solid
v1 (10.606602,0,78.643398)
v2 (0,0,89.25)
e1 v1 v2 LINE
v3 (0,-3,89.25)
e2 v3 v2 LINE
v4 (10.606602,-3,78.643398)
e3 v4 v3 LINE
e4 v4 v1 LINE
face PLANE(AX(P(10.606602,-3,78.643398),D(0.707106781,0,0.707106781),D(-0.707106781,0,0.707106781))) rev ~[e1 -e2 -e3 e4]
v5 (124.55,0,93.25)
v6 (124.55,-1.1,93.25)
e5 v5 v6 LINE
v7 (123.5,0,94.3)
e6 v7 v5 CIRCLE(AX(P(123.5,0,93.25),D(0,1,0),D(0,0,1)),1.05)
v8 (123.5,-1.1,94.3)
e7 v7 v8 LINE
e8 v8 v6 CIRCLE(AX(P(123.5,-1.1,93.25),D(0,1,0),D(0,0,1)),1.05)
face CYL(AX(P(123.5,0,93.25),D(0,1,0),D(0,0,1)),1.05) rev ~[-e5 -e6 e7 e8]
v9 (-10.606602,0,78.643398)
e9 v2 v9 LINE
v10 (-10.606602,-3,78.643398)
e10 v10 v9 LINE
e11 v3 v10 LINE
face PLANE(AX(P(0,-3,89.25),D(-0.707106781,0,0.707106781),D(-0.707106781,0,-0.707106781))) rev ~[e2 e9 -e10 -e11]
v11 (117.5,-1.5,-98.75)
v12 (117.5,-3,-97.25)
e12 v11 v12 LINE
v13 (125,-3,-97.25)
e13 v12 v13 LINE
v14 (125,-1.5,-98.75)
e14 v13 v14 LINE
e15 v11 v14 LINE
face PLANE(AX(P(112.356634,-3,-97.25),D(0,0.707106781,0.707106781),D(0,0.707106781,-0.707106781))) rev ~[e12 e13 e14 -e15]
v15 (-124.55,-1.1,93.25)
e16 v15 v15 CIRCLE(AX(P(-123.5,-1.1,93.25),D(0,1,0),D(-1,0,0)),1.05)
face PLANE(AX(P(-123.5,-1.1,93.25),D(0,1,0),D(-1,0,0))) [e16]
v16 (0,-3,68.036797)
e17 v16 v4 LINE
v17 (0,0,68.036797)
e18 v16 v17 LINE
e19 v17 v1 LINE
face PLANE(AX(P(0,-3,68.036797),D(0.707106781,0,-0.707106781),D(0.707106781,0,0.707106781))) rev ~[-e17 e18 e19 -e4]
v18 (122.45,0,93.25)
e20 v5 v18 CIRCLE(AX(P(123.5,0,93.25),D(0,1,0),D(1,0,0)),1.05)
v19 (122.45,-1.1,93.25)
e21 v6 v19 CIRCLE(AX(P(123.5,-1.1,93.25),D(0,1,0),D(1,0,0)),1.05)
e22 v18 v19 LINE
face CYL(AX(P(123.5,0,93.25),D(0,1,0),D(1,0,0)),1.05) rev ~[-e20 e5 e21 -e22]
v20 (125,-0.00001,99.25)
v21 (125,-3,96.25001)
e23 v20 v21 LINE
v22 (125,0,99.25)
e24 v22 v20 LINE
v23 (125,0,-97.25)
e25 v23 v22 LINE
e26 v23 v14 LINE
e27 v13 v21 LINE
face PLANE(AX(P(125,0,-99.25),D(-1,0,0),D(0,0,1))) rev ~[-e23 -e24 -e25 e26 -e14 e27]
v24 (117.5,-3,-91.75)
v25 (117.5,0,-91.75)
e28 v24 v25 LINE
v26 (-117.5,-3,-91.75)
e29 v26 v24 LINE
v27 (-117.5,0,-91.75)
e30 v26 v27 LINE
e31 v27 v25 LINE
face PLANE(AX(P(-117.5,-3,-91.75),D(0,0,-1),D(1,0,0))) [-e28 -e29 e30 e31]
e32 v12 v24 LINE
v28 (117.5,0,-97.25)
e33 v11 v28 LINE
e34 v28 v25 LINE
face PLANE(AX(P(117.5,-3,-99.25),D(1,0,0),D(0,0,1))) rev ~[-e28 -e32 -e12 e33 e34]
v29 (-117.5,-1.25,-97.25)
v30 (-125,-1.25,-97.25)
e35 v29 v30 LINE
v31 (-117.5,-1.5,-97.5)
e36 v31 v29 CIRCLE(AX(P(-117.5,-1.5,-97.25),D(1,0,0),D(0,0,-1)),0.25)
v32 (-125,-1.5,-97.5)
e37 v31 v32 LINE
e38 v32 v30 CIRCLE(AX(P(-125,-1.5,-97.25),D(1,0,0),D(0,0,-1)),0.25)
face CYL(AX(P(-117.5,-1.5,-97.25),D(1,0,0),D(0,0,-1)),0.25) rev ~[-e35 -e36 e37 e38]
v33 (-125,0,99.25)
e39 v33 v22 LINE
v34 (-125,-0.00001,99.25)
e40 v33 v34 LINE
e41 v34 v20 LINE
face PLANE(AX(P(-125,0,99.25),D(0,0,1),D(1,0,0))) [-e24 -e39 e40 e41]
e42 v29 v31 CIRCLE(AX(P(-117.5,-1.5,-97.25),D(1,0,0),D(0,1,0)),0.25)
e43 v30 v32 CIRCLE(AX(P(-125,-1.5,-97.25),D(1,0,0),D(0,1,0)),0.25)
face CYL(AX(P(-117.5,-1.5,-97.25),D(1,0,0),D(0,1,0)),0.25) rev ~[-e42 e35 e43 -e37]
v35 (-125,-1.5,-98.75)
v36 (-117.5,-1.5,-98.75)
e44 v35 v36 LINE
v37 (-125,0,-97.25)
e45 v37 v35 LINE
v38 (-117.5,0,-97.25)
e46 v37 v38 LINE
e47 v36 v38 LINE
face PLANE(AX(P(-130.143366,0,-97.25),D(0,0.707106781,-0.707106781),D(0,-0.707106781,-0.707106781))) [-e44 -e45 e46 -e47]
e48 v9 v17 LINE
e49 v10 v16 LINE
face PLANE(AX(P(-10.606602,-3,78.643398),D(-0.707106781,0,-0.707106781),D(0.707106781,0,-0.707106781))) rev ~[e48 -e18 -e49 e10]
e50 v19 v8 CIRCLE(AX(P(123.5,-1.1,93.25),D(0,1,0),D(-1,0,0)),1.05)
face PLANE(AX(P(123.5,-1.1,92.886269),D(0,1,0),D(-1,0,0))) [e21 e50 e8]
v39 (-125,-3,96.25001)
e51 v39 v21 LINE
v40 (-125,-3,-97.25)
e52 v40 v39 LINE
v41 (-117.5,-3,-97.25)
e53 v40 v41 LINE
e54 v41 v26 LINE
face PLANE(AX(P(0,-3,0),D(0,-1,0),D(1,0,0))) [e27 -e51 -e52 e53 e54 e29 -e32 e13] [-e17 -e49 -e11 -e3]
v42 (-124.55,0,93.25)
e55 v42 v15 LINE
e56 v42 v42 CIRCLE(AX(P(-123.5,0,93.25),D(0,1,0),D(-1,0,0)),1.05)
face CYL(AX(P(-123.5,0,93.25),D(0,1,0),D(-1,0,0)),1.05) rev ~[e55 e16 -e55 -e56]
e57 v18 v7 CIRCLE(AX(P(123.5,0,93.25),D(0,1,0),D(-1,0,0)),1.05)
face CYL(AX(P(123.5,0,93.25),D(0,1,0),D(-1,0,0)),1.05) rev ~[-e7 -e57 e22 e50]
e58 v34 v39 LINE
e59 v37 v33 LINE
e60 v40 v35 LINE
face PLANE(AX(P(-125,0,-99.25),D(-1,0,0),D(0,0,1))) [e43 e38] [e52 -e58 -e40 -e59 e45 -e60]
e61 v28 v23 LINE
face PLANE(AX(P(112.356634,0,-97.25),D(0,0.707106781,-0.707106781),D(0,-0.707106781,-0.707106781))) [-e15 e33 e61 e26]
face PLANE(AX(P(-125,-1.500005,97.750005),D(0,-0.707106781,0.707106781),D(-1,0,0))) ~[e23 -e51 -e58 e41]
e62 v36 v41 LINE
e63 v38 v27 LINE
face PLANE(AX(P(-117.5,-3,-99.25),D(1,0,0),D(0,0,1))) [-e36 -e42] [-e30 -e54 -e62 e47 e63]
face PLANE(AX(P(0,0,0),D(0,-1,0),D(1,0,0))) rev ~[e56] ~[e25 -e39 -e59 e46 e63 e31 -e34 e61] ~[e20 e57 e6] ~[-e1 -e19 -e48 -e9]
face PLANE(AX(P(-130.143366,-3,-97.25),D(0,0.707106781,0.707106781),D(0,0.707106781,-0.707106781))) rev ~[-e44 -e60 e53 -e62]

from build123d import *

# Parameters (mm, degrees)
F0_W        = 250
F0_H        = 198.5
F1_DEPTH    = 3
F2_W        = 235
F2_H        = 7.5
F3_DEPTH    = 30
F5_DEPTH    = 300
F6_T1_DEPTH = 17.7867319519
F6_T3_DEPTH = 17.7867319519
F8_DEPTH    = 25
F9_SIZE     = 2.99999
F10_R       = 1.05
F11_DEPTH   = 1.1


# Not quite as in the source:
# - a fillet or chamfer that OpenCascade refuses, or shapes differently, is made with other operations: its cross-section is extruded or revolved along the edge and cut away or added
# - a fillet or chamfer is up to 0.001 mm smaller than in the source, because OpenCascade refuses the exact size


with BuildPart() as f1:
    # F0 (on Front) → F1 (new body)
    with BuildSketch(Plane.XZ):
        Rectangle(F0_W, F0_H)
    extrude(amount=F1_DEPTH)

    # F2 (on face) → F3 (cut)
    with BuildSketch(Plane.XZ.offset(3)):
        with Locations((0, -95.5)):
            Rectangle(F2_W, F2_H)
    extrude(amount=-F3_DEPTH, mode=Mode.SUBTRACT)

    # F4 (on face) → F5 (cut)
    with BuildSketch(Plane.YZ.offset(-117.5)):
        with BuildLine():
            ThreePointArc((-1.25, -97.25), (-1.6767766953, -97.0732233047), (-1.5, -97.5))
            ThreePointArc((-1.5, -97.5), (-1.3232233047, -97.4267766953), (-1.25, -97.25))
        make_face()
    extrude(amount=-F5_DEPTH, mode=Mode.SUBTRACT)

    # F6: chamfer of 2 on 4 edges, made by hand

    # F6_s2 → F6_t1 (cut)
    with BuildSketch(Plane.YZ.offset(-130.1433659759)):
        Polygon((-3, -97.25), (-1, -99.25), (-3, -99.25), align=None)
        Polygon((0, -97.25), (-2, -99.25), (0, -99.25), align=None)
    extrude(amount=F6_T1_DEPTH, mode=Mode.SUBTRACT)

    # F6_s4 → F6_t3 (cut)
    with BuildSketch(Plane.YZ.offset(112.3566340241)):
        Polygon((-3, -97.25), (-1, -99.25), (-3, -99.25), align=None)
        Polygon((0, -97.25), (-2, -99.25), (0, -99.25), align=None)
    extrude(amount=F6_T3_DEPTH, mode=Mode.SUBTRACT)

    # F7 (on face) → F8 (cut)
    with BuildSketch(Plane.XZ.offset(3)):
        Polygon((0, 89.25), (-10.6066017178, 78.6433982822), (0, 68.0367965644), (10.6066017178, 78.6433982822), align=None)
    extrude(amount=-F8_DEPTH, mode=Mode.SUBTRACT)

    # F9 (size 3 in the source; OpenCascade refuses exactly that, so slightly less here)
    f9_edges = [f1.edges().sort_by_distance(p)[0] for p in [
        (0, -3, 99.25),
    ]]
    chamfer(f9_edges, length=F9_SIZE)

    # F10 (on face) → F11 (cut)
    with BuildSketch(Plane(origin=(0, 0, 0), x_dir=(-1, 0, 0), z_dir=(0, 1, 0))):
        with BuildLine():
            Line((-122.45, 93.25), (-123.5, 93.25))
            Line((-123.5, 93.25), (-124.55, 93.25))
            ThreePointArc((-124.55, 93.25), (-123.5, 92.2), (-122.45, 93.25))
        make_face()
        with BuildLine():
            Line((-123.5, 94.3), (-123.5, 93.25))
            Line((-123.5, 93.25), (-122.45, 93.25))
            ThreePointArc((-122.45, 93.25), (-122.7575378798, 93.9924621202), (-123.5, 94.3))
        make_face()
        with BuildLine():
            Line((-124.55, 93.25), (-123.5, 93.25))
            Line((-123.5, 93.25), (-123.5, 94.3))
            ThreePointArc((-123.5, 94.3), (-124.2424621202, 93.9924621202), (-124.55, 93.25))
        make_face()
        with Locations((123.5, 93.25)):
            Circle(F10_R)
    extrude(amount=-F11_DEPTH, mode=Mode.SUBTRACT)


solid = f1.part
